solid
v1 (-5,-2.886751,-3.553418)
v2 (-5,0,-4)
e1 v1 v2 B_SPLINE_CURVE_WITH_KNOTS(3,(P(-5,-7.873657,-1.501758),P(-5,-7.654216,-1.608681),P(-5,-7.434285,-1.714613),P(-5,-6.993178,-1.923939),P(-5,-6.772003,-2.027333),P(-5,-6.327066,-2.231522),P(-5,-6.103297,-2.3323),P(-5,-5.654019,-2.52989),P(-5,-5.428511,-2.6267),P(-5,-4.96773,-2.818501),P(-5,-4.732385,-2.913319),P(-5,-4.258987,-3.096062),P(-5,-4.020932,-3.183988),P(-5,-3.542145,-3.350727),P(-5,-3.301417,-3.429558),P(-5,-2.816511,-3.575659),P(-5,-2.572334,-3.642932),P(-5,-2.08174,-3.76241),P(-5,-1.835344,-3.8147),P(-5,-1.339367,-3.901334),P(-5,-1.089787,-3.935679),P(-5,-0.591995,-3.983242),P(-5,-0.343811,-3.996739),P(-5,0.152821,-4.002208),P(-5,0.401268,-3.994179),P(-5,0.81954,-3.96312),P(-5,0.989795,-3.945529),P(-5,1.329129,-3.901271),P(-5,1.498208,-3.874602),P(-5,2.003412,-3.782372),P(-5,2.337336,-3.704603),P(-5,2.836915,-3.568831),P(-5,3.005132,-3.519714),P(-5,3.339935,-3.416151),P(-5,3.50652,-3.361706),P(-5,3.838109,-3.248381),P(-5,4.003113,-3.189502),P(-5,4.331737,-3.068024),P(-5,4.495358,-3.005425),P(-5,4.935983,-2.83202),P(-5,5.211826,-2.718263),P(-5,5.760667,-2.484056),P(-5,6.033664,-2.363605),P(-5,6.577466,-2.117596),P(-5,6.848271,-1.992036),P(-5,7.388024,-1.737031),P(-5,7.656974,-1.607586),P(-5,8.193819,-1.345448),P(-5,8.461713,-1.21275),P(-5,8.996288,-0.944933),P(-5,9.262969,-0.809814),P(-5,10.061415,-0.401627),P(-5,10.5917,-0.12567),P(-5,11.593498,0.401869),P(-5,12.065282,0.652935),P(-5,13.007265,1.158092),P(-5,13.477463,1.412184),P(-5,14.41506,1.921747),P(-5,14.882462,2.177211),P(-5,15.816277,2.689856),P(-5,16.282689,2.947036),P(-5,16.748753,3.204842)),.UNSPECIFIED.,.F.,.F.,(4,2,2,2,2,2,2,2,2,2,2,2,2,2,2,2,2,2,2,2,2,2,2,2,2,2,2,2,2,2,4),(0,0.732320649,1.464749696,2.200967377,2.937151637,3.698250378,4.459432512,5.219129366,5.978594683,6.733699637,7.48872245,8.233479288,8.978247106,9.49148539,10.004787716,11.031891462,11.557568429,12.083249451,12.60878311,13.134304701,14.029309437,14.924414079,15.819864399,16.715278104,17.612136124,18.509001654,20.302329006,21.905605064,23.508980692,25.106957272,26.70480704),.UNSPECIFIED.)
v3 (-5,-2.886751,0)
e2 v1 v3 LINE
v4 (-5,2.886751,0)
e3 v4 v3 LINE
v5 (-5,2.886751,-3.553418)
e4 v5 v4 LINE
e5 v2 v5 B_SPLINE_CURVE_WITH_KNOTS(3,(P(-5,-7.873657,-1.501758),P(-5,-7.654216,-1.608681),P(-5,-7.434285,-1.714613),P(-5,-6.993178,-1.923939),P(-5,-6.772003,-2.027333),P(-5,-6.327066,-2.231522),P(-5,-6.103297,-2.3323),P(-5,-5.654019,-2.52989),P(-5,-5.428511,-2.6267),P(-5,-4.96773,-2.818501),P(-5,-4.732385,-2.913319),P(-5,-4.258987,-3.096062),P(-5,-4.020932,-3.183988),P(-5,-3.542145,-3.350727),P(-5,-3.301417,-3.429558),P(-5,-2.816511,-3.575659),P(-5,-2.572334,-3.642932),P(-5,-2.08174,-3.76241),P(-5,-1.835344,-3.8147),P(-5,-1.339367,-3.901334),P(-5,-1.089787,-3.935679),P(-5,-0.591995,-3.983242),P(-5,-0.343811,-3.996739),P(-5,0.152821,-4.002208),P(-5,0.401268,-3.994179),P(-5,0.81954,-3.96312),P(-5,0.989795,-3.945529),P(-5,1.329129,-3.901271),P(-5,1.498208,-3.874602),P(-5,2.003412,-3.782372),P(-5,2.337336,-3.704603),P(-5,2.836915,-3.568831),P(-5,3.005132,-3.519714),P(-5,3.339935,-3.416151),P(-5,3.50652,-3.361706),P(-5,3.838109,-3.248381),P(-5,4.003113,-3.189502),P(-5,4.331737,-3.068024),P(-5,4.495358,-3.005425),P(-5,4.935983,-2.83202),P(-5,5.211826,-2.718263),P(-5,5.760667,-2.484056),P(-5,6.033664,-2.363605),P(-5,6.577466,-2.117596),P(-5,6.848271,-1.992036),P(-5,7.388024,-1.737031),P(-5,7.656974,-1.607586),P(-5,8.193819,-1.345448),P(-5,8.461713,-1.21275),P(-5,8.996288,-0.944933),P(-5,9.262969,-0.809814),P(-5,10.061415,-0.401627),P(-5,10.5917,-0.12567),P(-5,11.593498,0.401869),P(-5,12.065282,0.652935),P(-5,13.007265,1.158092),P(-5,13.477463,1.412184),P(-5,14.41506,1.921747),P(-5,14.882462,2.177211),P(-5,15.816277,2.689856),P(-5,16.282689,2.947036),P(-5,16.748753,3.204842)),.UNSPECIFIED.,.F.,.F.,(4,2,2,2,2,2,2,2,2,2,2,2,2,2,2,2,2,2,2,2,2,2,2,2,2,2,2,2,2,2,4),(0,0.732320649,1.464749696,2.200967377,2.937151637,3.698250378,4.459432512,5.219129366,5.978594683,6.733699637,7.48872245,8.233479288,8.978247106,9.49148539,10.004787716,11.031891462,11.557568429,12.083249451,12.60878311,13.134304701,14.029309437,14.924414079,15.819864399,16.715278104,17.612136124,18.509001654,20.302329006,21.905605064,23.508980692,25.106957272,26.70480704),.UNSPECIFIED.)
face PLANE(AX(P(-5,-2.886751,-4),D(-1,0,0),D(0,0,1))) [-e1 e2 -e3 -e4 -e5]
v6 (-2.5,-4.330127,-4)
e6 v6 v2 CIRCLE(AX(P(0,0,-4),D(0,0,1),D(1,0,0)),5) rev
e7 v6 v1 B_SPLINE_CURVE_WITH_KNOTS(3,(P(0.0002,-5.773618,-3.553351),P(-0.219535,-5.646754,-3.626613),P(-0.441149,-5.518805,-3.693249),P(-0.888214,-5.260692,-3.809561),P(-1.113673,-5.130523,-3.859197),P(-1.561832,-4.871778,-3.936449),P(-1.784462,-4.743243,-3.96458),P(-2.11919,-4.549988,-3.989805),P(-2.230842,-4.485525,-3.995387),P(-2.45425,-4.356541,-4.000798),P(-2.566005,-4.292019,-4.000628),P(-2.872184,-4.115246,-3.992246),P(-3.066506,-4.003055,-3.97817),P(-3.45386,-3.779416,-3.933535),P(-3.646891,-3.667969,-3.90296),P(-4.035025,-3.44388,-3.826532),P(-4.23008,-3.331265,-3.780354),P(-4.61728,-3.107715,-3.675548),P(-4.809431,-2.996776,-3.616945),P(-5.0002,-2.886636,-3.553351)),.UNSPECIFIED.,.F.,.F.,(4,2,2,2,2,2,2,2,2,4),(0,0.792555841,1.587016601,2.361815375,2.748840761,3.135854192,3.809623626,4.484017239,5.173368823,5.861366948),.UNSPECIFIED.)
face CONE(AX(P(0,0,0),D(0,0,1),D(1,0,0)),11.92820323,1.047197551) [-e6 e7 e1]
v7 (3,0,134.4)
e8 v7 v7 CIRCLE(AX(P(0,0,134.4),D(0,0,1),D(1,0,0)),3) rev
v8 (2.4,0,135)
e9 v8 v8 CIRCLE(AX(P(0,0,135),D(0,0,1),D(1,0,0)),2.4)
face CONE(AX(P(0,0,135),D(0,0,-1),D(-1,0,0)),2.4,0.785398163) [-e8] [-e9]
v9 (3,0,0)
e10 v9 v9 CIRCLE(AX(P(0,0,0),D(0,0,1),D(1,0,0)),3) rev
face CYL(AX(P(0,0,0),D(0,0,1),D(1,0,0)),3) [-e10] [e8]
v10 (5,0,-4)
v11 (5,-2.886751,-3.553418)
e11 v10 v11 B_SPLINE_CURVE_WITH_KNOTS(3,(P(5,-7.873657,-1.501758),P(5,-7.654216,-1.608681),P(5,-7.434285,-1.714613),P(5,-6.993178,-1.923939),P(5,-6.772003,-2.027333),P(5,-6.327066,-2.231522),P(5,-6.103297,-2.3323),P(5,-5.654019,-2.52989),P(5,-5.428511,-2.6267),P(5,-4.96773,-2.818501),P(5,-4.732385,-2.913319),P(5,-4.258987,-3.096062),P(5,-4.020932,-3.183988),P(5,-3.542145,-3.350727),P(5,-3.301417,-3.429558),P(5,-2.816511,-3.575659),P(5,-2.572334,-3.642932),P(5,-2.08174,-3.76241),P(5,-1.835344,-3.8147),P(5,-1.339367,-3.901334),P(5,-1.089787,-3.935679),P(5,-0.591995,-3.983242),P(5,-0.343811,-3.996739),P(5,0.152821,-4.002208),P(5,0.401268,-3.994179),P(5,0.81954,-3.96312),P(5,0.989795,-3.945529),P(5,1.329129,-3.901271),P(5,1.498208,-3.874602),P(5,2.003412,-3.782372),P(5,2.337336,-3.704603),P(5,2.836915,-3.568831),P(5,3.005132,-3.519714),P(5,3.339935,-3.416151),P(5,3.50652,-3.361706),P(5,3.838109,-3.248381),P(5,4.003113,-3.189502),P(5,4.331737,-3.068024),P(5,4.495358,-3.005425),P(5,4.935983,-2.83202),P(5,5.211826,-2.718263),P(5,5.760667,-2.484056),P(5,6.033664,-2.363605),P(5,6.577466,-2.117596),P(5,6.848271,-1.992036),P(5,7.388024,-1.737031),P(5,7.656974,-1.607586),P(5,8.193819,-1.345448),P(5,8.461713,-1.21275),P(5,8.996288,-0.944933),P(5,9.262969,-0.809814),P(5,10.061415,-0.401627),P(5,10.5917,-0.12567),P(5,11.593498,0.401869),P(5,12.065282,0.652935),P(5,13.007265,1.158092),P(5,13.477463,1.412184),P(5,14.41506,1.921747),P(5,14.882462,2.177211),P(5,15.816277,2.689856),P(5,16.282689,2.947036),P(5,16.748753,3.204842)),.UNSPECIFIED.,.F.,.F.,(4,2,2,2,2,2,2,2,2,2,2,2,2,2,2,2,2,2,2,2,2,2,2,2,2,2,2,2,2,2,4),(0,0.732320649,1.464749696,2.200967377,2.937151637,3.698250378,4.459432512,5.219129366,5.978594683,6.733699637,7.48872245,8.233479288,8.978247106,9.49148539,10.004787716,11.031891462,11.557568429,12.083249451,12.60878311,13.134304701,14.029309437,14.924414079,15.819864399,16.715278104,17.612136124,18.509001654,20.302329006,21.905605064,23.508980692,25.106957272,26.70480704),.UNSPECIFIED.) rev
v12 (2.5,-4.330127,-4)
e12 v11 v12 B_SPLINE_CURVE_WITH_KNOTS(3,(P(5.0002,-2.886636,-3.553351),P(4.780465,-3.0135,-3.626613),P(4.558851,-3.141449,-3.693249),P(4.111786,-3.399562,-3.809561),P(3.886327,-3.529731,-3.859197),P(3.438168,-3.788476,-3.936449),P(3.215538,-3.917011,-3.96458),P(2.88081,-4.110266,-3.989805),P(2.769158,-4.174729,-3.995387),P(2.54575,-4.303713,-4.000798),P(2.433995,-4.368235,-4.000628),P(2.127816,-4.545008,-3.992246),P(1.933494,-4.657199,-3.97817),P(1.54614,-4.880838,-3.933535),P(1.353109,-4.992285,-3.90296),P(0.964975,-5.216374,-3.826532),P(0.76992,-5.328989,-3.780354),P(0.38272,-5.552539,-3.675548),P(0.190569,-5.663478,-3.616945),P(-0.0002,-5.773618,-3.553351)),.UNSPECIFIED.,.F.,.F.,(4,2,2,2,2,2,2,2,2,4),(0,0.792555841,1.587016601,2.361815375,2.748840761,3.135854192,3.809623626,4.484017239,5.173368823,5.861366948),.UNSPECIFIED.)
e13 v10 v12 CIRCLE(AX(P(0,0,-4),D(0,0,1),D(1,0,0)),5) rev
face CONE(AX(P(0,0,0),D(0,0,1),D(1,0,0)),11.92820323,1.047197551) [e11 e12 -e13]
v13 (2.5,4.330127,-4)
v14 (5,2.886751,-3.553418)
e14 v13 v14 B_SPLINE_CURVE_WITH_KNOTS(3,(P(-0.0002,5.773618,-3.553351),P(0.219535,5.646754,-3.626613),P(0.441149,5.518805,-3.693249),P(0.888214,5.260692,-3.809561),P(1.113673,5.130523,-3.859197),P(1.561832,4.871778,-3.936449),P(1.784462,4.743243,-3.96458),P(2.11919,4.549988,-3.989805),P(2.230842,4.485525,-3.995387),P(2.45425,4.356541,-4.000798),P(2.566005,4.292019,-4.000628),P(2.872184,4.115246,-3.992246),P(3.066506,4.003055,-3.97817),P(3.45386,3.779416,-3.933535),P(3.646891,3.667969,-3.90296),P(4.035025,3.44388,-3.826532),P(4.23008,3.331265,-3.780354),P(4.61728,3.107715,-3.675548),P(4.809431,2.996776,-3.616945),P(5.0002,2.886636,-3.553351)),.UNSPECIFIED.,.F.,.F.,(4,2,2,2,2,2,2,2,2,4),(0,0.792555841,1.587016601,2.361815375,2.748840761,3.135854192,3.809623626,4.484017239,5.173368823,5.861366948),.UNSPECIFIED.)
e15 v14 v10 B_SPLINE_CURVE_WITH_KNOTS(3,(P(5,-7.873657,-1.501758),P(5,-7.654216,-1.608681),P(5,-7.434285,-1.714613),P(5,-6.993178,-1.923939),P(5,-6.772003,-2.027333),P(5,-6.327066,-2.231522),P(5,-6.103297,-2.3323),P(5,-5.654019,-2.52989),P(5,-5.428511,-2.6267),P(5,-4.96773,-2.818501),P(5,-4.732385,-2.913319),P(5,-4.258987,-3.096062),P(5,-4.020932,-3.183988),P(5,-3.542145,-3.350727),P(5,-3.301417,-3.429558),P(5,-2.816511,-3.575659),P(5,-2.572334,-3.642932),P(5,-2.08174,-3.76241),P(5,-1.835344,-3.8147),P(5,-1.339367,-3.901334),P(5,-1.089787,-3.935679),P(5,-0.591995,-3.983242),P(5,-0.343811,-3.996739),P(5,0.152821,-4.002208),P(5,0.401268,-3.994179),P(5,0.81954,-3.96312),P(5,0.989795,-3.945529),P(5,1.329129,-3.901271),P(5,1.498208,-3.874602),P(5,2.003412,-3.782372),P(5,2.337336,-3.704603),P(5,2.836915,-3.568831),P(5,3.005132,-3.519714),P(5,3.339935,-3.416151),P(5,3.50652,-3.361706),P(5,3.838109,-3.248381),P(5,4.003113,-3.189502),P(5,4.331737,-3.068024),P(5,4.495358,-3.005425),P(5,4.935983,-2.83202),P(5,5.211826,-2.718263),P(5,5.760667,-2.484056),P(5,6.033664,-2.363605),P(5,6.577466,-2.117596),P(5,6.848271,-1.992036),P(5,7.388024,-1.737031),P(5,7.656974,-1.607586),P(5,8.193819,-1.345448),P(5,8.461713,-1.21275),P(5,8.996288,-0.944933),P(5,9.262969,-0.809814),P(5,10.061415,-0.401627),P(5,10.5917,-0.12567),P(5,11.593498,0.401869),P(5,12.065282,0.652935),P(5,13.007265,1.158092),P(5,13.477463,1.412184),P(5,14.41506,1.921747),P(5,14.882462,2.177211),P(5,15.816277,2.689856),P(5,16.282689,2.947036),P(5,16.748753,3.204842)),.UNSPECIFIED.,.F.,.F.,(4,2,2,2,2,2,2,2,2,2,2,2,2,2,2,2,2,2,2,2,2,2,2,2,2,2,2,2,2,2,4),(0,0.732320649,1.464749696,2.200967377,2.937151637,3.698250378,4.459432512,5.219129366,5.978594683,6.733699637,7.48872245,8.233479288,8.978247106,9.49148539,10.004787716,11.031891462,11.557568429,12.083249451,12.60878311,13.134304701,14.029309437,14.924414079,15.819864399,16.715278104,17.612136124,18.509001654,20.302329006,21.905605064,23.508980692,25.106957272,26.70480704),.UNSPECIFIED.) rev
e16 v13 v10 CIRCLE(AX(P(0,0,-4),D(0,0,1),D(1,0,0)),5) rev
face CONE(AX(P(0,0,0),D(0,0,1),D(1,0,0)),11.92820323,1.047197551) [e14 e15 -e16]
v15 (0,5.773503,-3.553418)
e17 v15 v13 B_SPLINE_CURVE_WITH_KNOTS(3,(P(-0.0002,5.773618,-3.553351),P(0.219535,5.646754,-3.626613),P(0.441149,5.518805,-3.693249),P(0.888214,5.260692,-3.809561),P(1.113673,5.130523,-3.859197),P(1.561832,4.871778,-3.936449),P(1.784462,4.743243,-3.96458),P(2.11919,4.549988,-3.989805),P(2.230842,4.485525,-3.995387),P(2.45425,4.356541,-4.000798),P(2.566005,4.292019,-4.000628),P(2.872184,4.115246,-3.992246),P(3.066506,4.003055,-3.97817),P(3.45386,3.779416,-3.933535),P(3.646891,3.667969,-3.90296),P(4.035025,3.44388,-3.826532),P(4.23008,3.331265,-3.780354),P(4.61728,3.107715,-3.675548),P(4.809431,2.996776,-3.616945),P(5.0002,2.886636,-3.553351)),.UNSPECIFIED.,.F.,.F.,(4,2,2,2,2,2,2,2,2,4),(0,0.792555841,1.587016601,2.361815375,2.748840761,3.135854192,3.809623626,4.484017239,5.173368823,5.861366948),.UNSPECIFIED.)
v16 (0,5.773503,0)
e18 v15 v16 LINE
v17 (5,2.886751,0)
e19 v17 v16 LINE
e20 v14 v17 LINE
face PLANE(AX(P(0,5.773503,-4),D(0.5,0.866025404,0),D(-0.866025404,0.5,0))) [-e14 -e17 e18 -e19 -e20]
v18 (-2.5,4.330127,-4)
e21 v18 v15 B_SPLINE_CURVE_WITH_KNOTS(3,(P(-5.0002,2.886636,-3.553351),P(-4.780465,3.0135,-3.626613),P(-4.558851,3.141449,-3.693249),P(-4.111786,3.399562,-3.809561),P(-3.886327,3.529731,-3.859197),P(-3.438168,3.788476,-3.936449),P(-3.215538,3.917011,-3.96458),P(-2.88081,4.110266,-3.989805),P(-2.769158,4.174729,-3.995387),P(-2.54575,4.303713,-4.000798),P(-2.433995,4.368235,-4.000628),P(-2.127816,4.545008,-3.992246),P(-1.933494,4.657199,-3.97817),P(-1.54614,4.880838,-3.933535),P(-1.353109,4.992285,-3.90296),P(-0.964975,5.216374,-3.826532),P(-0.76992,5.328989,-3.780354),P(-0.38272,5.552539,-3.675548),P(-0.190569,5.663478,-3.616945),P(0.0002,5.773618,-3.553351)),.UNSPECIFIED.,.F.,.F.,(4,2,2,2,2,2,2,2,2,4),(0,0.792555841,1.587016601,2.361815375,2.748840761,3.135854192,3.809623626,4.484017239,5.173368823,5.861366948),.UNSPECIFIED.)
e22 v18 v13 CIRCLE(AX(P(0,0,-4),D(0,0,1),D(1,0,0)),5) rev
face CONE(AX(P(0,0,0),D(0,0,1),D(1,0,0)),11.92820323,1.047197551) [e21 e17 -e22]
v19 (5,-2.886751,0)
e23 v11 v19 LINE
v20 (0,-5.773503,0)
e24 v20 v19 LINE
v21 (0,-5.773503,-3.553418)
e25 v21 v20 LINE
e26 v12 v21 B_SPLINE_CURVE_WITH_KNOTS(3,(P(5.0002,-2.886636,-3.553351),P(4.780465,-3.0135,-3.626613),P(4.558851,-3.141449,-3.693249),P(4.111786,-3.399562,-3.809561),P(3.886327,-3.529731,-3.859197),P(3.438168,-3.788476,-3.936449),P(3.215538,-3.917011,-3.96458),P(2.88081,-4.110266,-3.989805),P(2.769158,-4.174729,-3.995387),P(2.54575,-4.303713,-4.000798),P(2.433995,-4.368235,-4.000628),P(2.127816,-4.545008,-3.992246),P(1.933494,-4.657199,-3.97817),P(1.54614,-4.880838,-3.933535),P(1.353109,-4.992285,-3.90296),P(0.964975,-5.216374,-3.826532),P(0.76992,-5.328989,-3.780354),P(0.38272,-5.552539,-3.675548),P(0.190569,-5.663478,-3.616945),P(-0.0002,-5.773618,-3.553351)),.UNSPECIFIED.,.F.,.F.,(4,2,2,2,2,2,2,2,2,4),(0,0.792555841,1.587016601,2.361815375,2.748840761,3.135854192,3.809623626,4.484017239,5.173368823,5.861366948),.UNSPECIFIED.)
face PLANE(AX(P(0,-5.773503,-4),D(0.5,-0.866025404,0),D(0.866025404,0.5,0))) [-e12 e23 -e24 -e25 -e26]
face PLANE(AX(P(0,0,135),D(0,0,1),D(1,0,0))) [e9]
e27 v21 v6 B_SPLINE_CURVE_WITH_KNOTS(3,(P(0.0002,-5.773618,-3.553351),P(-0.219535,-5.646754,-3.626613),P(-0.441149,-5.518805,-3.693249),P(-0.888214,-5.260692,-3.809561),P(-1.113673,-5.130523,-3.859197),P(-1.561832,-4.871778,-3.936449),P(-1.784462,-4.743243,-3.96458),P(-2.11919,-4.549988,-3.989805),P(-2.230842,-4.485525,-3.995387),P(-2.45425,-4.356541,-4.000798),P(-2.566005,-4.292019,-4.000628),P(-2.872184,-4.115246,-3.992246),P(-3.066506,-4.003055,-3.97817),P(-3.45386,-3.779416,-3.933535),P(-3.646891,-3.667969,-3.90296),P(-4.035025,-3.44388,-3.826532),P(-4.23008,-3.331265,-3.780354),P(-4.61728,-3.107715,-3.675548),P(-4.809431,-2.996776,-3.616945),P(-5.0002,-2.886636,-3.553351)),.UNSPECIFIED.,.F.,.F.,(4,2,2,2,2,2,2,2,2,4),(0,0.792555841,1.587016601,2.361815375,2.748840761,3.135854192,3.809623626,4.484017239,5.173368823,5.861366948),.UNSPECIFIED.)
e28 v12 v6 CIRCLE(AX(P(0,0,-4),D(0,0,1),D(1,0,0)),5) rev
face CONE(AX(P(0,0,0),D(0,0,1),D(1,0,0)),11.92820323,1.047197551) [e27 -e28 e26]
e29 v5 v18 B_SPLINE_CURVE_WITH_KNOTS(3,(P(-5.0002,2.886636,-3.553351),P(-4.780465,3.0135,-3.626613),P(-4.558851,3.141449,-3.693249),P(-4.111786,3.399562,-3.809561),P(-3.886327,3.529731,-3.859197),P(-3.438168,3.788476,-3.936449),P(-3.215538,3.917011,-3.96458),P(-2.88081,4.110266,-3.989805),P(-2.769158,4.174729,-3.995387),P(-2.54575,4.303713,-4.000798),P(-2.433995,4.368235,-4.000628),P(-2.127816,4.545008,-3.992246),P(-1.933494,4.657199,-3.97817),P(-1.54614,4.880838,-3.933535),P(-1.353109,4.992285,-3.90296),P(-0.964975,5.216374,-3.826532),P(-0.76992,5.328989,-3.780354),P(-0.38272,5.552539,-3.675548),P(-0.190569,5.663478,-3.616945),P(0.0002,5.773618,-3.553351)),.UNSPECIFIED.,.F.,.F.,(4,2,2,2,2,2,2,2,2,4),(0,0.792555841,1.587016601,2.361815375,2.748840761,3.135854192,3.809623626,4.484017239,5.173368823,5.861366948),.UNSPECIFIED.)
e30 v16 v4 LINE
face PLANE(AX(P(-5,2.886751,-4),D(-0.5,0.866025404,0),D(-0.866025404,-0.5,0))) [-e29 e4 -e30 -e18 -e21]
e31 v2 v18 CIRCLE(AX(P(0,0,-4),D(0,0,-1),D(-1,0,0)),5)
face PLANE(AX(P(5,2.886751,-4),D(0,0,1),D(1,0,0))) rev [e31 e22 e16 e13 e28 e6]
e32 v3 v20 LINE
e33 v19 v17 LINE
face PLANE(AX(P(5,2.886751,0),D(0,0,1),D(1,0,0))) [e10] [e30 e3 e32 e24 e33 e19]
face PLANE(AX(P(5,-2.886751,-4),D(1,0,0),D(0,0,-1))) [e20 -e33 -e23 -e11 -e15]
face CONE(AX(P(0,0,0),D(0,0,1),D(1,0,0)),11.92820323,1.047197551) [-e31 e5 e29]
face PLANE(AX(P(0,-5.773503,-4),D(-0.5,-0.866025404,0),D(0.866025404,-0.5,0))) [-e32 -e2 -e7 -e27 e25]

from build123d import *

# Parameters (mm, degrees)
ESQUISSE1_W        = 3
ESQUISSE1_H        = 135
BOSS_EXTRU_1_DEPTH = 4


with BuildPart() as part:
    # Esquisse1 → Base-Révolution (revolve)
    with BuildSketch(Plane(origin=(0, 0, 0), x_dir=(1, 0, 0), z_dir=(0, 1, 0))):
        with Locations((1.5, -67.5)):
            Rectangle(ESQUISSE1_W, ESQUISSE1_H)
    revolve(axis=Axis((0, 0, 0), (0, 0, 1)))

    # Chanfrein1: read off the stored shape, not the designer's step
    # Chanfrein1 outline → Chanfrein1 (revolve, cut)
    with BuildSketch(Plane.XZ):
        Polygon((3, 135), (2.4, 135), (3, 134.4), align=None)
    revolve(axis=Axis((0, 0, 0), (0, 0, 1)), mode=Mode.SUBTRACT)

    # Esquisse6 → Boss.-Extru.1 (add)
    with BuildSketch(Plane.XY):
        Polygon((5, -2.886751346), (5, 2.886751346), (0, 5.773502692), (-5, 2.886751346), (-5, -2.886751346), (0, -5.773502692), align=None)
    extrude(amount=-BOSS_EXTRU_1_DEPTH)

    # Esquisse7 → Enlèvement de matière-Révolution1 (revolve, cut)
    with BuildSketch(Plane(origin=(0, 0, 0), x_dir=(1, 0, 0), z_dir=(0, 1, 0))):
        Polygon((-5, 4), (-11.92820323, 4), (-11.92820323, 0), align=None)
    revolve(axis=Axis((0, 0, -6.239446496), (0, 0, 1)), mode=Mode.SUBTRACT)


solid = part.part
